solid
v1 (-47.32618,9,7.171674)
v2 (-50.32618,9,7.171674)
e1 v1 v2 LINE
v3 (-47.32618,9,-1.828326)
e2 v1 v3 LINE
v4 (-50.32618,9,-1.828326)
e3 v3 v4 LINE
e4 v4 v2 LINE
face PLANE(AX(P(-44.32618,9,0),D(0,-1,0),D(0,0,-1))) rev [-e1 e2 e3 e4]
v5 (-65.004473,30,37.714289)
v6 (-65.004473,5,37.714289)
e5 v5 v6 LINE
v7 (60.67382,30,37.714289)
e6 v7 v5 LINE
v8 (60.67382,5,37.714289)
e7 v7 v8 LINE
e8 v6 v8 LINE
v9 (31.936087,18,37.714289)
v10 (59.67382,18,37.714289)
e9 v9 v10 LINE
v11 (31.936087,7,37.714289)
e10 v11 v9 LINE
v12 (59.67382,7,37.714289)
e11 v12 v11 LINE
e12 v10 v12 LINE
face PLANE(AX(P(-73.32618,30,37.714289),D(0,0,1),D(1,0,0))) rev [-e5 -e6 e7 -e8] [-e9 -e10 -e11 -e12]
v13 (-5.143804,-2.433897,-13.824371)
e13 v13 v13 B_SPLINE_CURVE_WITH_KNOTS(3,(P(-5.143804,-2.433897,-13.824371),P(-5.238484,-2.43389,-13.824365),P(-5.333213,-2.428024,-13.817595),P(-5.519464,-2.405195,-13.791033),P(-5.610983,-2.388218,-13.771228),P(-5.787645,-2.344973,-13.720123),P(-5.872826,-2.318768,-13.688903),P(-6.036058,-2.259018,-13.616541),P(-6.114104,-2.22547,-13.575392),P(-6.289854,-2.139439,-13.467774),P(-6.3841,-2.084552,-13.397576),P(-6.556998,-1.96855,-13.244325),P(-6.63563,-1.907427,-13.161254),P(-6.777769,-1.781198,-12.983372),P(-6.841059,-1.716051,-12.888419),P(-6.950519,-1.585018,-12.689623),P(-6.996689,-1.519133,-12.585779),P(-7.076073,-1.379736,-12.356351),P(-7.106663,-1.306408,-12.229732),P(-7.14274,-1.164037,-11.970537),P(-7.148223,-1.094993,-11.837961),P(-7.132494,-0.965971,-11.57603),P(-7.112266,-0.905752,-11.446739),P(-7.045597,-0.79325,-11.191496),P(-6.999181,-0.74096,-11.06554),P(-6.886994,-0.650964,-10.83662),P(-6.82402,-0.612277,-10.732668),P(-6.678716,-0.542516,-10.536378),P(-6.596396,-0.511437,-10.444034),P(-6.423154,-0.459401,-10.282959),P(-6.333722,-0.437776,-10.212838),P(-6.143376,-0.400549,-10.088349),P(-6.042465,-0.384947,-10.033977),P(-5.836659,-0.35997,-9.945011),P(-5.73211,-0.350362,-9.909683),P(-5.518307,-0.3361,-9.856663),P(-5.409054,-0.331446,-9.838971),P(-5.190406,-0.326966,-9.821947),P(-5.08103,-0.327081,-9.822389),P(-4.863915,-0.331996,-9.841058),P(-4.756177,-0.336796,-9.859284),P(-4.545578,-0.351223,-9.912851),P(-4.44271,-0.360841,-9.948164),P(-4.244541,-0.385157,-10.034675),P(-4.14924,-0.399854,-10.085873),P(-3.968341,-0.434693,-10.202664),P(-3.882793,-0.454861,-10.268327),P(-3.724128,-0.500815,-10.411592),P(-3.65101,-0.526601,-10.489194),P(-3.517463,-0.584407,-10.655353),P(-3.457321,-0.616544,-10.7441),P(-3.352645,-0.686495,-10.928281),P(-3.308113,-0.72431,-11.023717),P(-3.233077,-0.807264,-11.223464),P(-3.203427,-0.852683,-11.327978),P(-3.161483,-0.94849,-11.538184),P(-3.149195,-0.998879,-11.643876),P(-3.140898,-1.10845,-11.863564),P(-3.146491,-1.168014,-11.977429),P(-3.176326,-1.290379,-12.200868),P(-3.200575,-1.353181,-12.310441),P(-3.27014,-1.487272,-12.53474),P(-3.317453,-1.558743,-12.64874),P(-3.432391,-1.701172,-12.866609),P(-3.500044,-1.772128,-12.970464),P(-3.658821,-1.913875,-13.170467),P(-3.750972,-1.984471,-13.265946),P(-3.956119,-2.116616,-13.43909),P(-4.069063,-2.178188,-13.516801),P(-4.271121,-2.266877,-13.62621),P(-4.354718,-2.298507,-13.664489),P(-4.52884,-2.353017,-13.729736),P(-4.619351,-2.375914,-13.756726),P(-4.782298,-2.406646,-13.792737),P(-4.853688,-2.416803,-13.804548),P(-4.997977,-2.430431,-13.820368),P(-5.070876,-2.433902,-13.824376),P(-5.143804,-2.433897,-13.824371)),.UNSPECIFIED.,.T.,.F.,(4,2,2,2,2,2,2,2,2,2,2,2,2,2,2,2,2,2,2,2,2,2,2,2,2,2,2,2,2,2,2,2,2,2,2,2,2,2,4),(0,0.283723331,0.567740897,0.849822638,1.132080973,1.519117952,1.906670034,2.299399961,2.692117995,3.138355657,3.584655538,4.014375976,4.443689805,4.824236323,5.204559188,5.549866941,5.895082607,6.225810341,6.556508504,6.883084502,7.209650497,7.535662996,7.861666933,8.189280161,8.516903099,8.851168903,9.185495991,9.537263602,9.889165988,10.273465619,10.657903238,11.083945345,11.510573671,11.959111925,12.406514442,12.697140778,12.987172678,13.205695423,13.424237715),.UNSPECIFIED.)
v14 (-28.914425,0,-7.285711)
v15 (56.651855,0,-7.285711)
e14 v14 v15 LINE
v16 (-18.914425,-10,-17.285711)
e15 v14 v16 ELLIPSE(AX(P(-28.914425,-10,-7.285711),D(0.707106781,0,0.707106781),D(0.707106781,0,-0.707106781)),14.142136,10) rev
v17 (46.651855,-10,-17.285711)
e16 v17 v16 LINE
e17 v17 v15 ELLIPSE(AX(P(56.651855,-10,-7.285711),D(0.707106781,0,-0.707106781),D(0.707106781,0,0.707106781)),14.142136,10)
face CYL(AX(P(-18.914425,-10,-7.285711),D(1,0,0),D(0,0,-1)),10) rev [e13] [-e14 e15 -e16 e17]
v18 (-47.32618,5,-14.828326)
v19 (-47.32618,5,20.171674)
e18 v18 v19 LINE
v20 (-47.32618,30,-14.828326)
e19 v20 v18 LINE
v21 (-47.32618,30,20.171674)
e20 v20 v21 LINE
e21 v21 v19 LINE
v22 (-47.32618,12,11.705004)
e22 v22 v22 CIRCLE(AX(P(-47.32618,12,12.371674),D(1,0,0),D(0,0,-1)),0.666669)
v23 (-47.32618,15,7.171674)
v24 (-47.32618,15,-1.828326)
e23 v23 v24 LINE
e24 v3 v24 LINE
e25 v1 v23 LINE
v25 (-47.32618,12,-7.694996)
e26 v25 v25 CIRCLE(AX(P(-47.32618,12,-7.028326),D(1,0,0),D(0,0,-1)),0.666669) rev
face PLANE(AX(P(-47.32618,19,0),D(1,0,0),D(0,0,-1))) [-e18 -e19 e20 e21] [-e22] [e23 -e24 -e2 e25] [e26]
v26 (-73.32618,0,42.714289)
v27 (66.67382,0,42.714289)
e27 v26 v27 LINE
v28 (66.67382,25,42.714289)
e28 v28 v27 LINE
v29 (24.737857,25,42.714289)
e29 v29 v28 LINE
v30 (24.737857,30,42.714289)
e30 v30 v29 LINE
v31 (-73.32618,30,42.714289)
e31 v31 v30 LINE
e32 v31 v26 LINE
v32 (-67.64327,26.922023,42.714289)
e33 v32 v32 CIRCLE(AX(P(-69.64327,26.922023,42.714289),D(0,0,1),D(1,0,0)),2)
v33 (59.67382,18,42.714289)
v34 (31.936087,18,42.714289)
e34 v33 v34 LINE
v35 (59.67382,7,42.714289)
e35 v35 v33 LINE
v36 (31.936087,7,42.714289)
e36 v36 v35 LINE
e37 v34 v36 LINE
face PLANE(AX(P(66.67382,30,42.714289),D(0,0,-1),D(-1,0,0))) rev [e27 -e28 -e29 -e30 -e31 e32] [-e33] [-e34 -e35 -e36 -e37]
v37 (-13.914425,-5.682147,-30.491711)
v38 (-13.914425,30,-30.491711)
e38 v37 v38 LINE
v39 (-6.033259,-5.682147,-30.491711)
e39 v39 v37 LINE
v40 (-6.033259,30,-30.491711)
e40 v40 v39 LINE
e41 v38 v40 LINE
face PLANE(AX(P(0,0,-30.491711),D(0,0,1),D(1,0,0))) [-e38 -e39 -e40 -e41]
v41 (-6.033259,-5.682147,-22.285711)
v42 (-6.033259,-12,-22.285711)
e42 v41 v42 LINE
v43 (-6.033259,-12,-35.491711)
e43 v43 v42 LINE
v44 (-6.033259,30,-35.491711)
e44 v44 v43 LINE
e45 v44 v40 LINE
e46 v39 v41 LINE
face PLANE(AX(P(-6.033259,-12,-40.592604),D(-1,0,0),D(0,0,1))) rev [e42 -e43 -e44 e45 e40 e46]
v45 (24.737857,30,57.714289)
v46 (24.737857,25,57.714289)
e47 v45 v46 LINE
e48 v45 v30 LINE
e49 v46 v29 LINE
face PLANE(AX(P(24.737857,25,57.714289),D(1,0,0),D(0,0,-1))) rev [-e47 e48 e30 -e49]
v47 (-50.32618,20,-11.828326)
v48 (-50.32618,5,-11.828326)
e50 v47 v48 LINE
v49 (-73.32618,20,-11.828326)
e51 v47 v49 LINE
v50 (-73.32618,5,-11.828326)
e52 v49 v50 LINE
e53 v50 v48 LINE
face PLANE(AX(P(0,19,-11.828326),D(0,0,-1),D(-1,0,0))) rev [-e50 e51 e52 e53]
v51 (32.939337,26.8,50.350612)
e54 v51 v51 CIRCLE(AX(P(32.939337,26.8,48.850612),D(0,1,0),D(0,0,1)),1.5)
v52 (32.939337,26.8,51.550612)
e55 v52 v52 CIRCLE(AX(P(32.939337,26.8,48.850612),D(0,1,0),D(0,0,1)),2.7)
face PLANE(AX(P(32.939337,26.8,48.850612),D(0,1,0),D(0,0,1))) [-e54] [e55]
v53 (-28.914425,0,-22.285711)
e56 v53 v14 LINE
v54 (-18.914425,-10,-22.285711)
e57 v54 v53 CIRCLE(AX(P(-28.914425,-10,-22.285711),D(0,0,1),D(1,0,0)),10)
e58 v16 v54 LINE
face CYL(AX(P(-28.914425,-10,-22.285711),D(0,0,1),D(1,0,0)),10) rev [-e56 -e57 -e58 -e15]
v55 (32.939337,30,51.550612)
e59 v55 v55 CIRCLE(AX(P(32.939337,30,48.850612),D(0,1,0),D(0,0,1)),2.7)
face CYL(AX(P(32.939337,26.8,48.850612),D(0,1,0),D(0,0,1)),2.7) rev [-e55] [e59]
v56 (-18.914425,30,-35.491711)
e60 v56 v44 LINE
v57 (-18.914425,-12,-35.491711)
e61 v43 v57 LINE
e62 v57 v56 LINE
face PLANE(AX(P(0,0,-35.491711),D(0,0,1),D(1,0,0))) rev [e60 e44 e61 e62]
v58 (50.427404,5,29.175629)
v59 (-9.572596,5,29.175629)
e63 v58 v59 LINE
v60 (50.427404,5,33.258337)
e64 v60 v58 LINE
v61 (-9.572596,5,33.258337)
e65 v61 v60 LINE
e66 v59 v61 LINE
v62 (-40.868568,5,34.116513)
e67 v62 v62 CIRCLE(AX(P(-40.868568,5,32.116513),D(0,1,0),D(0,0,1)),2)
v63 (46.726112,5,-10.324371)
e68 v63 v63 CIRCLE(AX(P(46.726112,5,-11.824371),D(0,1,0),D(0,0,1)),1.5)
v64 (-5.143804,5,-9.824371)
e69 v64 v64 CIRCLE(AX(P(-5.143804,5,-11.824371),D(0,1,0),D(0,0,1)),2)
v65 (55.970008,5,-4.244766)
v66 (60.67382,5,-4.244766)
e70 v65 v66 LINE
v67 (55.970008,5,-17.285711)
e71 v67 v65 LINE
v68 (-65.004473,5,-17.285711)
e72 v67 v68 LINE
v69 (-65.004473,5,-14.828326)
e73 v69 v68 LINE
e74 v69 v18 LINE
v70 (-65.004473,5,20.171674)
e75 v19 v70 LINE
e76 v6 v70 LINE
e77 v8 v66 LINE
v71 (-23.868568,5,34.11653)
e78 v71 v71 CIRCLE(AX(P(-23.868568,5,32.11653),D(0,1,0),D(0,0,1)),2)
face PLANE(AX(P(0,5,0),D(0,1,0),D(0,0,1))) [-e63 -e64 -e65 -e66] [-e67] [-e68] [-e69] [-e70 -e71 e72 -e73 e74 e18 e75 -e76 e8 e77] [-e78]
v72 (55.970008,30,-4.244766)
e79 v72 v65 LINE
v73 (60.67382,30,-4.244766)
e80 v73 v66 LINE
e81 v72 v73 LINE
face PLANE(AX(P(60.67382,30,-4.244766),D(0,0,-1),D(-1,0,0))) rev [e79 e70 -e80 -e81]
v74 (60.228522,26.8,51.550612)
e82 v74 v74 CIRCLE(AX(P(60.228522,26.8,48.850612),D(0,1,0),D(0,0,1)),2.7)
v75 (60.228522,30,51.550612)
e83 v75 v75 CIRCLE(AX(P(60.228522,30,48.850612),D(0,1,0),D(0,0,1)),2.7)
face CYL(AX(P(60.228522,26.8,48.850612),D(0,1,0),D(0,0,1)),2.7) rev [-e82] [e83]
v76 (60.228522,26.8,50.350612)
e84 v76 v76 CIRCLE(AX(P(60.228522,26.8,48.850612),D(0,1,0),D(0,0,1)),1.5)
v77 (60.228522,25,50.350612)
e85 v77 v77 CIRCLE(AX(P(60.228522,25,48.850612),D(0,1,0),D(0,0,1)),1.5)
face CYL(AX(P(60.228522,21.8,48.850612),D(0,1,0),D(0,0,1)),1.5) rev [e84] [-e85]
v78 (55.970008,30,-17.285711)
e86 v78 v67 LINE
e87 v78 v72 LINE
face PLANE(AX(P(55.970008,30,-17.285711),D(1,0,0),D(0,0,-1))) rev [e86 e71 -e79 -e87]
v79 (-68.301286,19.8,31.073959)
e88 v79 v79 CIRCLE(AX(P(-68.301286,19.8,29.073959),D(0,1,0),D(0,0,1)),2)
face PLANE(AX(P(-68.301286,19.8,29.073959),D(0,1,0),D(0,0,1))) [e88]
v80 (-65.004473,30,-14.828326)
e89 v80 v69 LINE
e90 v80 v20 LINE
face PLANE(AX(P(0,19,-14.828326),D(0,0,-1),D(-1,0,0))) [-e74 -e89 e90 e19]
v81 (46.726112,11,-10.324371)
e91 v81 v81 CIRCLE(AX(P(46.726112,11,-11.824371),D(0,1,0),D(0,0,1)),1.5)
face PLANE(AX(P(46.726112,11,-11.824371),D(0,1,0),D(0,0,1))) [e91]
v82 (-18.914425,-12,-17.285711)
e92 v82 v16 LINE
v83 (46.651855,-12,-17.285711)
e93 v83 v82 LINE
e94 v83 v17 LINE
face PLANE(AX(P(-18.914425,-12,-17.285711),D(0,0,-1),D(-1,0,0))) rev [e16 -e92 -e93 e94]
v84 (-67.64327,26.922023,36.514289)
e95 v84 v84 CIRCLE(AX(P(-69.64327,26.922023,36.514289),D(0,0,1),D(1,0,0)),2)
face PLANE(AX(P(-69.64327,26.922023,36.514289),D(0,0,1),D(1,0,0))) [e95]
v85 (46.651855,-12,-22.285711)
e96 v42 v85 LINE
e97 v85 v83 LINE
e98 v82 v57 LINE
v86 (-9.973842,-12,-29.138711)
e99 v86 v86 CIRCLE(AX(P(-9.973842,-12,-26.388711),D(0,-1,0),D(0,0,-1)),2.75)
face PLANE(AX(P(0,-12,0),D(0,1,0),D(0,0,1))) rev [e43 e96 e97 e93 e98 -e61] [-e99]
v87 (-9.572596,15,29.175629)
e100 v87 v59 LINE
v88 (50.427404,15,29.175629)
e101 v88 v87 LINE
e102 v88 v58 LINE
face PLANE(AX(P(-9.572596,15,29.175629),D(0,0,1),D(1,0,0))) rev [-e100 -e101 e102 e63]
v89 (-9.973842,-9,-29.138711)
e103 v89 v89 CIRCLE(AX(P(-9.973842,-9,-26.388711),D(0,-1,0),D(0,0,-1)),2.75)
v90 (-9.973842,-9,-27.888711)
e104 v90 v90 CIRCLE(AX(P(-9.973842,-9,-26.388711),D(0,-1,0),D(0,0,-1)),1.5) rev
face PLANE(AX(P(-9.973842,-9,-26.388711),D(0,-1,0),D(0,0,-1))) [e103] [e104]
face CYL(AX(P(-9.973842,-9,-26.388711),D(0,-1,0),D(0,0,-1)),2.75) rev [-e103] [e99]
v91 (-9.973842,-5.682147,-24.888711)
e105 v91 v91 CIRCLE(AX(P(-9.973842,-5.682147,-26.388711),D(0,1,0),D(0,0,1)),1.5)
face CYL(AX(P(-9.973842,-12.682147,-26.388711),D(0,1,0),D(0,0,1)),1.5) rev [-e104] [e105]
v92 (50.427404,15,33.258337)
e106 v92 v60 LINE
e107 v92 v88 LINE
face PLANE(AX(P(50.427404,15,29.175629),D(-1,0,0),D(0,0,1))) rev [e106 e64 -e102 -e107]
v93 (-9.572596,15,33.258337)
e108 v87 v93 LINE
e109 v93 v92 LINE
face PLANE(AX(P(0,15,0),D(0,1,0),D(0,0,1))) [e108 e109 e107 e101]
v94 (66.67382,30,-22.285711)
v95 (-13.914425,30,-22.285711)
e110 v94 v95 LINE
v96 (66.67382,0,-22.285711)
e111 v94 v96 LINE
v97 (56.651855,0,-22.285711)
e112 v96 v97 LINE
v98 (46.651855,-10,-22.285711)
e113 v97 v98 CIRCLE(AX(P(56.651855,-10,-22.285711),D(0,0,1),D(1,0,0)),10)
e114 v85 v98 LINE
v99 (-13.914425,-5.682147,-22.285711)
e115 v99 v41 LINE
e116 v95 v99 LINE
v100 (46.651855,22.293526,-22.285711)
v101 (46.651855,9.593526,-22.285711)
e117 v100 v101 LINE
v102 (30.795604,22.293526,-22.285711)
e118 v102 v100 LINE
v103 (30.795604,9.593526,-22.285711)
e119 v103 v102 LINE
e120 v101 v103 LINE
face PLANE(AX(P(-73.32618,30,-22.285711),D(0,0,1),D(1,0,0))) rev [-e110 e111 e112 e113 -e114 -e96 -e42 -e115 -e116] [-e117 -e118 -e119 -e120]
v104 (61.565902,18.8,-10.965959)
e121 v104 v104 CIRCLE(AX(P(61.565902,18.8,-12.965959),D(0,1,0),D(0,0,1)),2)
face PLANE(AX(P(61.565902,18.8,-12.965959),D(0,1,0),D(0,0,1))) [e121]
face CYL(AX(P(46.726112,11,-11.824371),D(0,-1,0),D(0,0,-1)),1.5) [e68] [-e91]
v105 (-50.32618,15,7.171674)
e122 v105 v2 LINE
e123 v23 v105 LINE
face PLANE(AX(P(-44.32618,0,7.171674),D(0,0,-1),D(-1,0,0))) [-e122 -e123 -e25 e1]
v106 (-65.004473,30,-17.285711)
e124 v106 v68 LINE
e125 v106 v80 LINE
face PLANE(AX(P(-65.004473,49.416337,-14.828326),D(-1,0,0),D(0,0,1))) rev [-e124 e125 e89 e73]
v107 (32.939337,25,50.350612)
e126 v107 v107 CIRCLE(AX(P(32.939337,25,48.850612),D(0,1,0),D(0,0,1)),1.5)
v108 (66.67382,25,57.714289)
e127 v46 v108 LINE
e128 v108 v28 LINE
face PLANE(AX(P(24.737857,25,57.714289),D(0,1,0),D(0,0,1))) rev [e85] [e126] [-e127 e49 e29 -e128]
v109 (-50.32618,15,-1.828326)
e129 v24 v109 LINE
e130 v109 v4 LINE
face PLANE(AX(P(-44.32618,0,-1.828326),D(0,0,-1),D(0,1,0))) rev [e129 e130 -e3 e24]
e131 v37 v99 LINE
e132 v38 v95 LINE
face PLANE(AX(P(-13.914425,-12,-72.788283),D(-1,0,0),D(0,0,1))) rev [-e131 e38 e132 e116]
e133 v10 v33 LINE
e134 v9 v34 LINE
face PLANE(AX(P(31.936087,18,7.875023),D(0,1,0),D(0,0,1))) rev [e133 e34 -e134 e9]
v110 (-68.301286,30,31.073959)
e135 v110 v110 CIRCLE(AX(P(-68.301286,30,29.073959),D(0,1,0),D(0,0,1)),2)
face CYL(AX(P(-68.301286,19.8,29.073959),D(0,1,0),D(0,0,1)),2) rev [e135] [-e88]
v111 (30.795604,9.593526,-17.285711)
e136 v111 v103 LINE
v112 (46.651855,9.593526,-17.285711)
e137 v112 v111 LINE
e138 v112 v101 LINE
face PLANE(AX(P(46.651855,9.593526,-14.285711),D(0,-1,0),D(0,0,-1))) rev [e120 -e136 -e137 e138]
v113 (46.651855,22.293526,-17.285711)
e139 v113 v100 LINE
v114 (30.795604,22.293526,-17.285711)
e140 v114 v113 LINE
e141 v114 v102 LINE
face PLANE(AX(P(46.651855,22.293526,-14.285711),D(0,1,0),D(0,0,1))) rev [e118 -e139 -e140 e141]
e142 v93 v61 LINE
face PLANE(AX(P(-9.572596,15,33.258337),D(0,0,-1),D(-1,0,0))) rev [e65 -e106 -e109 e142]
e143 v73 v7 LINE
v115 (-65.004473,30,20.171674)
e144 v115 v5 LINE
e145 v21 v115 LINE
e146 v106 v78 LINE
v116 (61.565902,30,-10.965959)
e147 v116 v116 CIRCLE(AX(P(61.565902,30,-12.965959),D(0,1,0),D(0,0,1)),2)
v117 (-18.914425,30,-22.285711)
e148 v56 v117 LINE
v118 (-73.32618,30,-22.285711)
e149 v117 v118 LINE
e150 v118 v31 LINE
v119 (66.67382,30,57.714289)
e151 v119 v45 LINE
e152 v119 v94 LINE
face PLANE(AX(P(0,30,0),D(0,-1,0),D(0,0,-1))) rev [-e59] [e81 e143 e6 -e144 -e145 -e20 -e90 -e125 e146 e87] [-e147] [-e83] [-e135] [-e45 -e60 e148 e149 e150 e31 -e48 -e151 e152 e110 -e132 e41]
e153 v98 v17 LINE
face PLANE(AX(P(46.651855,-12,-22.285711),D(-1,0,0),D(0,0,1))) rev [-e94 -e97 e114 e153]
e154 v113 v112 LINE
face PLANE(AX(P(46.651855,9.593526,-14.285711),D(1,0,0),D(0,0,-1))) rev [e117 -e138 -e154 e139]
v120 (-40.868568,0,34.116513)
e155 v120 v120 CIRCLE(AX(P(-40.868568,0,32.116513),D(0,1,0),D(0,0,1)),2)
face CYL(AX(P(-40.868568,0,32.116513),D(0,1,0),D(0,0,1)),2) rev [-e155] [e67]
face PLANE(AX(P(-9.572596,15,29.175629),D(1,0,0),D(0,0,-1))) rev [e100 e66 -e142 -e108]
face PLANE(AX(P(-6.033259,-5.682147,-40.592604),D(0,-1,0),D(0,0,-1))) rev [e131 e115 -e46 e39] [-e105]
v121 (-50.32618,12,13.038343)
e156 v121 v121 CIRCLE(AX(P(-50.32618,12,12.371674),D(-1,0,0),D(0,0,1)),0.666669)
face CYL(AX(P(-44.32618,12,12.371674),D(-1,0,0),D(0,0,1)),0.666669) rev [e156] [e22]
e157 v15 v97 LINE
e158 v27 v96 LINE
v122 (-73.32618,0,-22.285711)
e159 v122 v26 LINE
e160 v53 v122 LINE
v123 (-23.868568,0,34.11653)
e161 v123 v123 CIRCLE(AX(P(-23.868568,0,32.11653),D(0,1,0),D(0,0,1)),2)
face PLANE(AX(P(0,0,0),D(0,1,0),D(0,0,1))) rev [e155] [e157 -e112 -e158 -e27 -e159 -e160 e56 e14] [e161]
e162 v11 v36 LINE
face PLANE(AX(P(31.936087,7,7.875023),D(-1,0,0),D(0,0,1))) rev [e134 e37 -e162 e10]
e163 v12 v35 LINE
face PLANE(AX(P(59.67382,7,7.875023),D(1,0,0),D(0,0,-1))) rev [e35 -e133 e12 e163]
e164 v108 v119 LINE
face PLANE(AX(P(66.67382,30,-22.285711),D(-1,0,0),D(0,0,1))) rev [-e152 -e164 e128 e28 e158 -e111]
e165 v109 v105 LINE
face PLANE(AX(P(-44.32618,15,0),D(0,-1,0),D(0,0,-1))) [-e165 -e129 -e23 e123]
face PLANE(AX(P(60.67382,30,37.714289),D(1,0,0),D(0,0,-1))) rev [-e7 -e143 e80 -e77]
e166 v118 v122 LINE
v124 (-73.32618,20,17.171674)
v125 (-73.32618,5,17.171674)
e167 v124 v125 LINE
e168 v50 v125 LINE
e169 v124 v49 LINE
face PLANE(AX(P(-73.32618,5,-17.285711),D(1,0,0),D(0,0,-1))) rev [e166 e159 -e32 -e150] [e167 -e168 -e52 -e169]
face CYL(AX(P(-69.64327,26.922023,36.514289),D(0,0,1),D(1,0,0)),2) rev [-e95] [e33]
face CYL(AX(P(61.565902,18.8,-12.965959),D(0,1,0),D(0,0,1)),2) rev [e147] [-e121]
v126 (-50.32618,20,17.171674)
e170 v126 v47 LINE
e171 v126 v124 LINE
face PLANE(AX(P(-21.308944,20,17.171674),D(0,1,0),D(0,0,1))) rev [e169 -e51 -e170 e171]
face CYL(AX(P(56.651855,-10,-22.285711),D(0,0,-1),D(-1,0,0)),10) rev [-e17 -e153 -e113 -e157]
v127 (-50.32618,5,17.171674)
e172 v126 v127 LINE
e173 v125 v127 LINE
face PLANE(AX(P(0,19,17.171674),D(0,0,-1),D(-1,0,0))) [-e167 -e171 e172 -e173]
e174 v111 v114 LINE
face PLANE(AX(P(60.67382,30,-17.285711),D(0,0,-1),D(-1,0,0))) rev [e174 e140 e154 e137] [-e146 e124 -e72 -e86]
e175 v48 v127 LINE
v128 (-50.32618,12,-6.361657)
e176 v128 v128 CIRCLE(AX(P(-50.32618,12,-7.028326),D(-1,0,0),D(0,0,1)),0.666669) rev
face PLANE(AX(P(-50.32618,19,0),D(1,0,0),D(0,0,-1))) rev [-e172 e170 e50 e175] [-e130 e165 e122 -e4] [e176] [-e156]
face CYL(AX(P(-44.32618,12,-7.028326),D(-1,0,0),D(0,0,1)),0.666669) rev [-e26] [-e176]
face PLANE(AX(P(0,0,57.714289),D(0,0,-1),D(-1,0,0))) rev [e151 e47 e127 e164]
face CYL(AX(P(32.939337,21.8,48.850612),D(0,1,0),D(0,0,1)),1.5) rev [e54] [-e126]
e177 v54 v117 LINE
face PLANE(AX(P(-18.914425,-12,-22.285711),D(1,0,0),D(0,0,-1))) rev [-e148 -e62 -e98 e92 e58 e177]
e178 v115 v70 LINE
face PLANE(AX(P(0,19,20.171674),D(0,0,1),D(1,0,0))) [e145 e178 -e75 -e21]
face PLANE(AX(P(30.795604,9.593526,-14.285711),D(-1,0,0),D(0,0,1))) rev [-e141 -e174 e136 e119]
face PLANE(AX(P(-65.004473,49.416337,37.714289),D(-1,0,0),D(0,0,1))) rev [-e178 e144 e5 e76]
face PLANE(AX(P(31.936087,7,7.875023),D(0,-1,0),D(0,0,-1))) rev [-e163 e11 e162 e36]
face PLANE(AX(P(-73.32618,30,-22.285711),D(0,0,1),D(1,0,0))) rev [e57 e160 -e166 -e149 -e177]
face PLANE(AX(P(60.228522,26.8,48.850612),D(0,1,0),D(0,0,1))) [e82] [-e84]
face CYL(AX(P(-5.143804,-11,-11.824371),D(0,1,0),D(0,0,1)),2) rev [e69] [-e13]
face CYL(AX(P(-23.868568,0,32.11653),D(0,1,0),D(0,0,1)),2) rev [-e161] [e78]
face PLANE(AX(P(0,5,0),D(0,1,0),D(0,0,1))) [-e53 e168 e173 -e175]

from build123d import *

# Parameters (mm, degrees)
SKETCH1_W            = 134
SKETCH1_H            = 55
BOSS_EXTRUDE1_DEPTH  = 5
BOSS_EXTRUDE2_DEPTH  = 14
SKETCH6_R            = 2
CUT_EXTRUDE2_DEPTH   = 16
BOSS_EXTRUDE4_DEPTH  = 10
SKETCH8_R            = 1.5
BOSS_EXTRUDE5_DEPTH  = 6
SKETCH9_W            = 9
SKETCH9_H            = 6
SKETCH9_R            = 0.666669423
CUT_EXTRUDE3_DEPTH   = 6
BOSS_EXTRUDE6_DEPTH  = 30
SKETCH11_W           = 26
SKETCH11_H           = 35
BOSS_EXTRUDE7_DEPTH  = 11
SKETCH12_R           = 2
CUT_EXTRUDE4_DEPTH   = 89.466034115
SKETCH13_W           = 29
SKETCH13_H           = 1
CUT_EXTRUDE5_DEPTH   = 23
BOSS_EXTRUDE8_DEPTH  = 12
SKETCH15_W           = 7.881166065
SKETCH15_H           = 6.31785274
BOSS_EXTRUDE9_DEPTH  = 8.206
SKETCH17_W           = 5
SKETCH17_H           = 42
BOSS_EXTRUDE10_DEPTH = 8.206
SKETCH18_W           = 27.737732315
SKETCH18_H           = 11
CUT_EXTRUDE6_DEPTH   = 5
SKETCH19_W           = 8.32170706
SKETCH19_H           = 17.542615134
SKETCH19_H_2         = 2.457384866
BOSS_EXTRUDE11_DEPTH = 25
SKETCH21_W           = 41.935962389
SKETCH21_H           = 5
BOSS_EXTRUDE12_DEPTH = 15
SKETCH22_R           = 2.7
CUT_EXTRUDE7_DEPTH   = 3.2
SKETCH23_R           = 1.5
CUT_EXTRUDE8_DEPTH   = 8.2
SKETCH24_R           = 2
CUT_EXTRUDE9_DEPTH   = 6.2
SKETCH25_R           = 2
CUT_EXTRUDE10_DEPTH  = 10.2
SKETCH26_W           = 4.703812025
SKETCH26_H           = 13.040944853
BOSS_EXTRUDE13_DEPTH = 25
SKETCH27_R           = 2
CUT_EXTRUDE11_DEPTH  = 11.2
SKETCH28_W           = 12.881166065
SKETCH28_H           = 42
BOSS_EXTRUDE14_DEPTH = 5
SKETCH29_R           = 1.5
CUT_EXTRUDE12_DEPTH  = 7
SKETCH30_R           = 2.75
CUT_EXTRUDE13_DEPTH  = 3
SKETCH31_W           = 15.85625148
SKETCH31_H           = 12.7
CUT_EXTRUDE14_DEPTH  = 8
FILLET1_R            = 10
FILLET2_R            = 10
FILLET3_R            = 10


with BuildPart() as part:
    # Sketch1 → Boss-Extrude1 (new body)
    with BuildSketch(Plane(origin=(0, 0, 0), x_dir=(1, 0, 0), z_dir=(0, 1, 0))):
        with Locations((-6.326180258, -10.214288954)):
            Rectangle(SKETCH1_W, SKETCH1_H)
    extrude(amount=BOSS_EXTRUDE1_DEPTH)

    # Sketch2 → Boss-Extrude2 (add)
    with BuildSketch(Plane(origin=(0, 5, 0), x_dir=(1, 0, 0), z_dir=(0, 1, 0))):
        Polygon((-73.326180258, 14.82832618), (-73.326180258, 11.82832618), (-50.326180258, 11.82832618), (-50.326180258, -17.17167382), (-73.326180258, -17.17167382), (-73.326180258, -20.17167382), (-47.326180258, -20.17167382), (-47.326180258, 14.82832618), align=None)
    extrude(amount=BOSS_EXTRUDE2_DEPTH)

    # Sketch6 → Cut-Extrude2 (cut)
    with BuildSketch(Plane(origin=(0, 5, 0), x_dir=(1, 0, 0), z_dir=(0, 1, 0))):
        with Locations(Location((-5.143804301, 11.824371315, 0), (0, 0, 270))):
            Circle(SKETCH6_R)
    extrude(amount=-CUT_EXTRUDE2_DEPTH, mode=Mode.SUBTRACT)

    # Sketch7 → Boss-Extrude4 (add)
    with BuildSketch(Plane(origin=(0, 5, 0), x_dir=(1, 0, 0), z_dir=(0, 1, 0))):
        Polygon((-9.572595602, -29.175628685), (12.857306, -29.175628685), (50.427404398, -29.175628685), (50.427404398, -33.25833673), (-9.572595602, -33.25833673), align=None)
    extrude(amount=BOSS_EXTRUDE4_DEPTH)

    # Sketch8 → Boss-Extrude5 (add)
    with BuildSketch(Plane(origin=(0, 5, 0), x_dir=(1, 0, 0), z_dir=(0, 1, 0))):
        with Locations(Location((46.72611237, 11.824371315, 0), (0, 0, 270))):
            Circle(SKETCH8_R)
    extrude(amount=BOSS_EXTRUDE5_DEPTH)

    # Sketch9 → Cut-Extrude3 (cut)
    with BuildSketch(Plane.ZY.offset(50.326180258)):
        with Locations((2.67167382, 12)):
            Rectangle(SKETCH9_W, SKETCH9_H)
        with Locations((-7.02832618, 12)):
            Circle(SKETCH9_R)
        with Locations((12.37167382, 12)):
            Circle(SKETCH9_R)
    extrude(amount=-CUT_EXTRUDE3_DEPTH, mode=Mode.SUBTRACT)

    # Sketch10 → Boss-Extrude6 (add)
    with BuildSketch(Plane(origin=(0, 0, 0), x_dir=(1, 0, 0), z_dir=(0, 1, 0))):
        Polygon((-73.326180258, 17.285711046), (-73.326180258, 22.285711046), (66.673819742, 22.285711046), (66.673819742, -42.714288954), (-73.326180258, -42.714288954), (-73.326180258, -37.714288954), (60.673819742, -37.714288954), (60.673819742, 17.285711046), align=None)
    extrude(amount=BOSS_EXTRUDE6_DEPTH)

    # Sketch11 → Boss-Extrude7 (add)
    with BuildSketch(Plane(origin=(0, 19, 0), x_dir=(1, 0, 0), z_dir=(0, 1, 0))):
        with Locations((-60.326180258, -2.67167382)):
            Rectangle(SKETCH11_W, SKETCH11_H)
    extrude(amount=BOSS_EXTRUDE7_DEPTH)

    # Sketch12 → Cut-Extrude4 (cut, through all)
    with BuildSketch(Plane(origin=(0, 5, 0), x_dir=(1, 0, 0), z_dir=(0, 1, 0))):
        with Locations(Location((-40.868568225, -32.116513497, 0), (0, 0, 270))):
            Circle(SKETCH12_R)
        with Locations(Location((-23.868568225, -32.116530453, 0), (0, 0, 270))):
            Circle(SKETCH12_R)
    extrude(amount=-CUT_EXTRUDE4_DEPTH, mode=Mode.SUBTRACT)

    # Sketch13 → Cut-Extrude5 (cut)
    with BuildSketch(Plane.ZY.offset(73.326180258)):
        with Locations((2.67167382, 19.5)):
            Rectangle(SKETCH13_W, SKETCH13_H)
    extrude(amount=-CUT_EXTRUDE5_DEPTH, mode=Mode.SUBTRACT)

    # Sketch14 → Boss-Extrude8 (add)
    with BuildSketch(Plane.XZ):
        Polygon((-13.914425371, -22.285711046), (46.65185498, -22.285711046), (46.65185498, -17.285711046), (-13.914425371, -17.285711046), (-18.914425371, -17.285711046), (-18.914425371, -22.285711046), align=None)
    extrude(amount=BOSS_EXTRUDE8_DEPTH)

    # Sketch15 → Boss-Extrude9 (add)
    with BuildSketch(Plane(origin=(0, 0, -22.285711046), x_dir=(-1, 0, 0), z_dir=(0, 0, -1))):
        with Locations((9.973842339, -8.84107363)):
            Rectangle(SKETCH15_W, SKETCH15_H)
    extrude(amount=BOSS_EXTRUDE9_DEPTH)

    # Sketch17 → Boss-Extrude10 (add)
    with BuildSketch(Plane(origin=(0, 0, -22.285711046), x_dir=(-1, 0, 0), z_dir=(0, 0, -1))):
        with Locations((16.414425371, 9)):
            Rectangle(SKETCH17_W, SKETCH17_H)
    extrude(amount=BOSS_EXTRUDE10_DEPTH)

    # Sketch18 → Cut-Extrude6 (cut)
    with BuildSketch(Plane.XY.offset(42.714288954)):
        with Locations((45.804953585, 12.5)):
            Rectangle(SKETCH18_W, SKETCH18_H)
    extrude(amount=-CUT_EXTRUDE6_DEPTH, mode=Mode.SUBTRACT)

    # Sketch19 → Boss-Extrude11 (add)
    with BuildSketch(Plane(origin=(0, 5, 0), x_dir=(1, 0, 0), z_dir=(0, 1, 0))):
        with Locations((-69.165326728, -28.942981387)):
            Rectangle(SKETCH19_W, SKETCH19_H)
        with Locations((-69.165326728, 16.057018613)):
            Rectangle(SKETCH19_W, SKETCH19_H_2)
    extrude(amount=BOSS_EXTRUDE11_DEPTH)

    # Sketch21 → Boss-Extrude12 (add)
    with BuildSketch(Plane.XY.offset(42.714288954)):
        with Locations((45.705838548, 27.5)):
            Rectangle(SKETCH21_W, SKETCH21_H)
    extrude(amount=BOSS_EXTRUDE12_DEPTH)

    # Sketch22 → Cut-Extrude7 (cut)
    with BuildSketch(Plane(origin=(0, 30, 0), x_dir=(1, 0, 0), z_dir=(0, 1, 0))):
        with Locations(Location((32.939337155, -48.85061207, 0), (0, 0, 270))):
            Circle(SKETCH22_R)
        with Locations(Location((60.22852181, -48.85061207, 0), (0, 0, 270))):
            Circle(SKETCH22_R)
    extrude(amount=-CUT_EXTRUDE7_DEPTH, mode=Mode.SUBTRACT)

    # Sketch23 → Cut-Extrude8 (cut)
    with BuildSketch(Plane(origin=(0, 30, 0), x_dir=(1, 0, 0), z_dir=(0, 1, 0))):
        with Locations(Location((60.22852181, -48.85061207, 0), (0, 0, 270))):
            Circle(SKETCH23_R)
        with Locations(Location((32.939337155, -48.85061207, 0), (0, 0, 270))):
            Circle(SKETCH23_R)
    extrude(amount=-CUT_EXTRUDE8_DEPTH, mode=Mode.SUBTRACT)

    # Sketch24 → Cut-Extrude9 (cut)
    with BuildSketch(Plane.XY.offset(42.714288954)):
        with Locations((-69.643270331, 26.922023127)):
            Circle(SKETCH24_R)
    extrude(amount=-CUT_EXTRUDE9_DEPTH, mode=Mode.SUBTRACT)

    # Sketch25 → Cut-Extrude10 (cut)
    with BuildSketch(Plane(origin=(0, 30, 0), x_dir=(1, 0, 0), z_dir=(0, 1, 0))):
        with Locations(Location((-68.301285916, -29.073958674, 0), (0, 0, 270))):
            Circle(SKETCH25_R)
    extrude(amount=-CUT_EXTRUDE10_DEPTH, mode=Mode.SUBTRACT)

    # Sketch26 → Boss-Extrude13 (add)
    with BuildSketch(Plane(origin=(0, 5, 0), x_dir=(1, 0, 0), z_dir=(0, 1, 0))):
        with Locations((58.32191373, 10.765238619)):
            Rectangle(SKETCH26_W, SKETCH26_H)
    extrude(amount=BOSS_EXTRUDE13_DEPTH)

    # Sketch27 → Cut-Extrude11 (cut)
    with BuildSketch(Plane(origin=(0, 30, 0), x_dir=(1, 0, 0), z_dir=(0, 1, 0))):
        with Locations(Location((61.565901952, 12.965958555, 0), (0, 0, 270))):
            Circle(SKETCH27_R)
    extrude(amount=-CUT_EXTRUDE11_DEPTH, mode=Mode.SUBTRACT)

    # Sketch28 → Boss-Extrude14 (add)
    with BuildSketch(Plane(origin=(0, 0, -30.491711046), x_dir=(-1, 0, 0), z_dir=(0, 0, -1))):
        with Locations((12.473842339, 9)):
            Rectangle(SKETCH28_W, SKETCH28_H)
    extrude(amount=BOSS_EXTRUDE14_DEPTH)

    # Sketch29 → Cut-Extrude12 (cut)
    with BuildSketch(Plane(origin=(0, -5.68214726, 0), x_dir=(1, 0, 0), z_dir=(0, 1, 0))):
        with Locations(Location((-9.973842338, 26.388711046, 0), (0, 0, 270))):
            Circle(SKETCH29_R)
    extrude(amount=-CUT_EXTRUDE12_DEPTH, mode=Mode.SUBTRACT)

    # Sketch30 → Cut-Extrude13 (cut)
    with BuildSketch(Plane.XZ.offset(12)):
        with Locations(Location((-9.973842338, -26.388711046, 0), (0, 0, 270))):
            Circle(SKETCH30_R)
    extrude(amount=-CUT_EXTRUDE13_DEPTH, mode=Mode.SUBTRACT)

    # Sketch31 → Cut-Extrude14 (cut)
    with BuildSketch(Plane(origin=(0, 0, -22.285711046), x_dir=(-1, 0, 0), z_dir=(0, 0, -1))):
        with Locations((-38.72372924, 15.943526368)):
            Rectangle(SKETCH31_W, SKETCH31_H)
    extrude(amount=-CUT_EXTRUDE14_DEPTH, mode=Mode.SUBTRACT)

    # Fillet1
    # the kernel refuses this fillet: 10 mm, written as the material it adds along each edge
    with BuildSketch(Plane(origin=(46.65185498, 0, -17.285711046), x_dir=(0, 0, 1), z_dir=(-1, 0, 0))) as fillet1_piece_1_section:
        with BuildLine():
            CenterArc((FILLET1_R, -FILLET1_R), FILLET1_R, 90, 90)
            Line((0, -FILLET1_R), (0, 0))
            Line((0, 0), (FILLET1_R, 0))
        make_face()
    fillet1_piece_1 = extrude(amount=65.56628035, mode=Mode.PRIVATE)
    fillet1_piece_1 = fillet1_piece_1 - Plane(origin=(-5.143804301, -2.281344891, -11.824371315), x_dir=(0, 0, 1), z_dir=(0, 1, 0)) * Cylinder(2, 172, mode=Mode.PRIVATE)
    add(fillet1_piece_1)

    # Fillet2
    fillet2_edges = [part.edges().sort_by_distance(p)[0] for p in [
        (-18.914425371, 0, -14.785711046),
    ]]
    fillet(fillet2_edges, radius=FILLET2_R)

    # Fillet3
    fillet3_edges = [part.edges().sort_by_distance(p)[0] for p in [
        (46.65185498, 0, -14.785711046),
    ]]
    fillet(fillet3_edges, radius=FILLET3_R)


solid = part.part
